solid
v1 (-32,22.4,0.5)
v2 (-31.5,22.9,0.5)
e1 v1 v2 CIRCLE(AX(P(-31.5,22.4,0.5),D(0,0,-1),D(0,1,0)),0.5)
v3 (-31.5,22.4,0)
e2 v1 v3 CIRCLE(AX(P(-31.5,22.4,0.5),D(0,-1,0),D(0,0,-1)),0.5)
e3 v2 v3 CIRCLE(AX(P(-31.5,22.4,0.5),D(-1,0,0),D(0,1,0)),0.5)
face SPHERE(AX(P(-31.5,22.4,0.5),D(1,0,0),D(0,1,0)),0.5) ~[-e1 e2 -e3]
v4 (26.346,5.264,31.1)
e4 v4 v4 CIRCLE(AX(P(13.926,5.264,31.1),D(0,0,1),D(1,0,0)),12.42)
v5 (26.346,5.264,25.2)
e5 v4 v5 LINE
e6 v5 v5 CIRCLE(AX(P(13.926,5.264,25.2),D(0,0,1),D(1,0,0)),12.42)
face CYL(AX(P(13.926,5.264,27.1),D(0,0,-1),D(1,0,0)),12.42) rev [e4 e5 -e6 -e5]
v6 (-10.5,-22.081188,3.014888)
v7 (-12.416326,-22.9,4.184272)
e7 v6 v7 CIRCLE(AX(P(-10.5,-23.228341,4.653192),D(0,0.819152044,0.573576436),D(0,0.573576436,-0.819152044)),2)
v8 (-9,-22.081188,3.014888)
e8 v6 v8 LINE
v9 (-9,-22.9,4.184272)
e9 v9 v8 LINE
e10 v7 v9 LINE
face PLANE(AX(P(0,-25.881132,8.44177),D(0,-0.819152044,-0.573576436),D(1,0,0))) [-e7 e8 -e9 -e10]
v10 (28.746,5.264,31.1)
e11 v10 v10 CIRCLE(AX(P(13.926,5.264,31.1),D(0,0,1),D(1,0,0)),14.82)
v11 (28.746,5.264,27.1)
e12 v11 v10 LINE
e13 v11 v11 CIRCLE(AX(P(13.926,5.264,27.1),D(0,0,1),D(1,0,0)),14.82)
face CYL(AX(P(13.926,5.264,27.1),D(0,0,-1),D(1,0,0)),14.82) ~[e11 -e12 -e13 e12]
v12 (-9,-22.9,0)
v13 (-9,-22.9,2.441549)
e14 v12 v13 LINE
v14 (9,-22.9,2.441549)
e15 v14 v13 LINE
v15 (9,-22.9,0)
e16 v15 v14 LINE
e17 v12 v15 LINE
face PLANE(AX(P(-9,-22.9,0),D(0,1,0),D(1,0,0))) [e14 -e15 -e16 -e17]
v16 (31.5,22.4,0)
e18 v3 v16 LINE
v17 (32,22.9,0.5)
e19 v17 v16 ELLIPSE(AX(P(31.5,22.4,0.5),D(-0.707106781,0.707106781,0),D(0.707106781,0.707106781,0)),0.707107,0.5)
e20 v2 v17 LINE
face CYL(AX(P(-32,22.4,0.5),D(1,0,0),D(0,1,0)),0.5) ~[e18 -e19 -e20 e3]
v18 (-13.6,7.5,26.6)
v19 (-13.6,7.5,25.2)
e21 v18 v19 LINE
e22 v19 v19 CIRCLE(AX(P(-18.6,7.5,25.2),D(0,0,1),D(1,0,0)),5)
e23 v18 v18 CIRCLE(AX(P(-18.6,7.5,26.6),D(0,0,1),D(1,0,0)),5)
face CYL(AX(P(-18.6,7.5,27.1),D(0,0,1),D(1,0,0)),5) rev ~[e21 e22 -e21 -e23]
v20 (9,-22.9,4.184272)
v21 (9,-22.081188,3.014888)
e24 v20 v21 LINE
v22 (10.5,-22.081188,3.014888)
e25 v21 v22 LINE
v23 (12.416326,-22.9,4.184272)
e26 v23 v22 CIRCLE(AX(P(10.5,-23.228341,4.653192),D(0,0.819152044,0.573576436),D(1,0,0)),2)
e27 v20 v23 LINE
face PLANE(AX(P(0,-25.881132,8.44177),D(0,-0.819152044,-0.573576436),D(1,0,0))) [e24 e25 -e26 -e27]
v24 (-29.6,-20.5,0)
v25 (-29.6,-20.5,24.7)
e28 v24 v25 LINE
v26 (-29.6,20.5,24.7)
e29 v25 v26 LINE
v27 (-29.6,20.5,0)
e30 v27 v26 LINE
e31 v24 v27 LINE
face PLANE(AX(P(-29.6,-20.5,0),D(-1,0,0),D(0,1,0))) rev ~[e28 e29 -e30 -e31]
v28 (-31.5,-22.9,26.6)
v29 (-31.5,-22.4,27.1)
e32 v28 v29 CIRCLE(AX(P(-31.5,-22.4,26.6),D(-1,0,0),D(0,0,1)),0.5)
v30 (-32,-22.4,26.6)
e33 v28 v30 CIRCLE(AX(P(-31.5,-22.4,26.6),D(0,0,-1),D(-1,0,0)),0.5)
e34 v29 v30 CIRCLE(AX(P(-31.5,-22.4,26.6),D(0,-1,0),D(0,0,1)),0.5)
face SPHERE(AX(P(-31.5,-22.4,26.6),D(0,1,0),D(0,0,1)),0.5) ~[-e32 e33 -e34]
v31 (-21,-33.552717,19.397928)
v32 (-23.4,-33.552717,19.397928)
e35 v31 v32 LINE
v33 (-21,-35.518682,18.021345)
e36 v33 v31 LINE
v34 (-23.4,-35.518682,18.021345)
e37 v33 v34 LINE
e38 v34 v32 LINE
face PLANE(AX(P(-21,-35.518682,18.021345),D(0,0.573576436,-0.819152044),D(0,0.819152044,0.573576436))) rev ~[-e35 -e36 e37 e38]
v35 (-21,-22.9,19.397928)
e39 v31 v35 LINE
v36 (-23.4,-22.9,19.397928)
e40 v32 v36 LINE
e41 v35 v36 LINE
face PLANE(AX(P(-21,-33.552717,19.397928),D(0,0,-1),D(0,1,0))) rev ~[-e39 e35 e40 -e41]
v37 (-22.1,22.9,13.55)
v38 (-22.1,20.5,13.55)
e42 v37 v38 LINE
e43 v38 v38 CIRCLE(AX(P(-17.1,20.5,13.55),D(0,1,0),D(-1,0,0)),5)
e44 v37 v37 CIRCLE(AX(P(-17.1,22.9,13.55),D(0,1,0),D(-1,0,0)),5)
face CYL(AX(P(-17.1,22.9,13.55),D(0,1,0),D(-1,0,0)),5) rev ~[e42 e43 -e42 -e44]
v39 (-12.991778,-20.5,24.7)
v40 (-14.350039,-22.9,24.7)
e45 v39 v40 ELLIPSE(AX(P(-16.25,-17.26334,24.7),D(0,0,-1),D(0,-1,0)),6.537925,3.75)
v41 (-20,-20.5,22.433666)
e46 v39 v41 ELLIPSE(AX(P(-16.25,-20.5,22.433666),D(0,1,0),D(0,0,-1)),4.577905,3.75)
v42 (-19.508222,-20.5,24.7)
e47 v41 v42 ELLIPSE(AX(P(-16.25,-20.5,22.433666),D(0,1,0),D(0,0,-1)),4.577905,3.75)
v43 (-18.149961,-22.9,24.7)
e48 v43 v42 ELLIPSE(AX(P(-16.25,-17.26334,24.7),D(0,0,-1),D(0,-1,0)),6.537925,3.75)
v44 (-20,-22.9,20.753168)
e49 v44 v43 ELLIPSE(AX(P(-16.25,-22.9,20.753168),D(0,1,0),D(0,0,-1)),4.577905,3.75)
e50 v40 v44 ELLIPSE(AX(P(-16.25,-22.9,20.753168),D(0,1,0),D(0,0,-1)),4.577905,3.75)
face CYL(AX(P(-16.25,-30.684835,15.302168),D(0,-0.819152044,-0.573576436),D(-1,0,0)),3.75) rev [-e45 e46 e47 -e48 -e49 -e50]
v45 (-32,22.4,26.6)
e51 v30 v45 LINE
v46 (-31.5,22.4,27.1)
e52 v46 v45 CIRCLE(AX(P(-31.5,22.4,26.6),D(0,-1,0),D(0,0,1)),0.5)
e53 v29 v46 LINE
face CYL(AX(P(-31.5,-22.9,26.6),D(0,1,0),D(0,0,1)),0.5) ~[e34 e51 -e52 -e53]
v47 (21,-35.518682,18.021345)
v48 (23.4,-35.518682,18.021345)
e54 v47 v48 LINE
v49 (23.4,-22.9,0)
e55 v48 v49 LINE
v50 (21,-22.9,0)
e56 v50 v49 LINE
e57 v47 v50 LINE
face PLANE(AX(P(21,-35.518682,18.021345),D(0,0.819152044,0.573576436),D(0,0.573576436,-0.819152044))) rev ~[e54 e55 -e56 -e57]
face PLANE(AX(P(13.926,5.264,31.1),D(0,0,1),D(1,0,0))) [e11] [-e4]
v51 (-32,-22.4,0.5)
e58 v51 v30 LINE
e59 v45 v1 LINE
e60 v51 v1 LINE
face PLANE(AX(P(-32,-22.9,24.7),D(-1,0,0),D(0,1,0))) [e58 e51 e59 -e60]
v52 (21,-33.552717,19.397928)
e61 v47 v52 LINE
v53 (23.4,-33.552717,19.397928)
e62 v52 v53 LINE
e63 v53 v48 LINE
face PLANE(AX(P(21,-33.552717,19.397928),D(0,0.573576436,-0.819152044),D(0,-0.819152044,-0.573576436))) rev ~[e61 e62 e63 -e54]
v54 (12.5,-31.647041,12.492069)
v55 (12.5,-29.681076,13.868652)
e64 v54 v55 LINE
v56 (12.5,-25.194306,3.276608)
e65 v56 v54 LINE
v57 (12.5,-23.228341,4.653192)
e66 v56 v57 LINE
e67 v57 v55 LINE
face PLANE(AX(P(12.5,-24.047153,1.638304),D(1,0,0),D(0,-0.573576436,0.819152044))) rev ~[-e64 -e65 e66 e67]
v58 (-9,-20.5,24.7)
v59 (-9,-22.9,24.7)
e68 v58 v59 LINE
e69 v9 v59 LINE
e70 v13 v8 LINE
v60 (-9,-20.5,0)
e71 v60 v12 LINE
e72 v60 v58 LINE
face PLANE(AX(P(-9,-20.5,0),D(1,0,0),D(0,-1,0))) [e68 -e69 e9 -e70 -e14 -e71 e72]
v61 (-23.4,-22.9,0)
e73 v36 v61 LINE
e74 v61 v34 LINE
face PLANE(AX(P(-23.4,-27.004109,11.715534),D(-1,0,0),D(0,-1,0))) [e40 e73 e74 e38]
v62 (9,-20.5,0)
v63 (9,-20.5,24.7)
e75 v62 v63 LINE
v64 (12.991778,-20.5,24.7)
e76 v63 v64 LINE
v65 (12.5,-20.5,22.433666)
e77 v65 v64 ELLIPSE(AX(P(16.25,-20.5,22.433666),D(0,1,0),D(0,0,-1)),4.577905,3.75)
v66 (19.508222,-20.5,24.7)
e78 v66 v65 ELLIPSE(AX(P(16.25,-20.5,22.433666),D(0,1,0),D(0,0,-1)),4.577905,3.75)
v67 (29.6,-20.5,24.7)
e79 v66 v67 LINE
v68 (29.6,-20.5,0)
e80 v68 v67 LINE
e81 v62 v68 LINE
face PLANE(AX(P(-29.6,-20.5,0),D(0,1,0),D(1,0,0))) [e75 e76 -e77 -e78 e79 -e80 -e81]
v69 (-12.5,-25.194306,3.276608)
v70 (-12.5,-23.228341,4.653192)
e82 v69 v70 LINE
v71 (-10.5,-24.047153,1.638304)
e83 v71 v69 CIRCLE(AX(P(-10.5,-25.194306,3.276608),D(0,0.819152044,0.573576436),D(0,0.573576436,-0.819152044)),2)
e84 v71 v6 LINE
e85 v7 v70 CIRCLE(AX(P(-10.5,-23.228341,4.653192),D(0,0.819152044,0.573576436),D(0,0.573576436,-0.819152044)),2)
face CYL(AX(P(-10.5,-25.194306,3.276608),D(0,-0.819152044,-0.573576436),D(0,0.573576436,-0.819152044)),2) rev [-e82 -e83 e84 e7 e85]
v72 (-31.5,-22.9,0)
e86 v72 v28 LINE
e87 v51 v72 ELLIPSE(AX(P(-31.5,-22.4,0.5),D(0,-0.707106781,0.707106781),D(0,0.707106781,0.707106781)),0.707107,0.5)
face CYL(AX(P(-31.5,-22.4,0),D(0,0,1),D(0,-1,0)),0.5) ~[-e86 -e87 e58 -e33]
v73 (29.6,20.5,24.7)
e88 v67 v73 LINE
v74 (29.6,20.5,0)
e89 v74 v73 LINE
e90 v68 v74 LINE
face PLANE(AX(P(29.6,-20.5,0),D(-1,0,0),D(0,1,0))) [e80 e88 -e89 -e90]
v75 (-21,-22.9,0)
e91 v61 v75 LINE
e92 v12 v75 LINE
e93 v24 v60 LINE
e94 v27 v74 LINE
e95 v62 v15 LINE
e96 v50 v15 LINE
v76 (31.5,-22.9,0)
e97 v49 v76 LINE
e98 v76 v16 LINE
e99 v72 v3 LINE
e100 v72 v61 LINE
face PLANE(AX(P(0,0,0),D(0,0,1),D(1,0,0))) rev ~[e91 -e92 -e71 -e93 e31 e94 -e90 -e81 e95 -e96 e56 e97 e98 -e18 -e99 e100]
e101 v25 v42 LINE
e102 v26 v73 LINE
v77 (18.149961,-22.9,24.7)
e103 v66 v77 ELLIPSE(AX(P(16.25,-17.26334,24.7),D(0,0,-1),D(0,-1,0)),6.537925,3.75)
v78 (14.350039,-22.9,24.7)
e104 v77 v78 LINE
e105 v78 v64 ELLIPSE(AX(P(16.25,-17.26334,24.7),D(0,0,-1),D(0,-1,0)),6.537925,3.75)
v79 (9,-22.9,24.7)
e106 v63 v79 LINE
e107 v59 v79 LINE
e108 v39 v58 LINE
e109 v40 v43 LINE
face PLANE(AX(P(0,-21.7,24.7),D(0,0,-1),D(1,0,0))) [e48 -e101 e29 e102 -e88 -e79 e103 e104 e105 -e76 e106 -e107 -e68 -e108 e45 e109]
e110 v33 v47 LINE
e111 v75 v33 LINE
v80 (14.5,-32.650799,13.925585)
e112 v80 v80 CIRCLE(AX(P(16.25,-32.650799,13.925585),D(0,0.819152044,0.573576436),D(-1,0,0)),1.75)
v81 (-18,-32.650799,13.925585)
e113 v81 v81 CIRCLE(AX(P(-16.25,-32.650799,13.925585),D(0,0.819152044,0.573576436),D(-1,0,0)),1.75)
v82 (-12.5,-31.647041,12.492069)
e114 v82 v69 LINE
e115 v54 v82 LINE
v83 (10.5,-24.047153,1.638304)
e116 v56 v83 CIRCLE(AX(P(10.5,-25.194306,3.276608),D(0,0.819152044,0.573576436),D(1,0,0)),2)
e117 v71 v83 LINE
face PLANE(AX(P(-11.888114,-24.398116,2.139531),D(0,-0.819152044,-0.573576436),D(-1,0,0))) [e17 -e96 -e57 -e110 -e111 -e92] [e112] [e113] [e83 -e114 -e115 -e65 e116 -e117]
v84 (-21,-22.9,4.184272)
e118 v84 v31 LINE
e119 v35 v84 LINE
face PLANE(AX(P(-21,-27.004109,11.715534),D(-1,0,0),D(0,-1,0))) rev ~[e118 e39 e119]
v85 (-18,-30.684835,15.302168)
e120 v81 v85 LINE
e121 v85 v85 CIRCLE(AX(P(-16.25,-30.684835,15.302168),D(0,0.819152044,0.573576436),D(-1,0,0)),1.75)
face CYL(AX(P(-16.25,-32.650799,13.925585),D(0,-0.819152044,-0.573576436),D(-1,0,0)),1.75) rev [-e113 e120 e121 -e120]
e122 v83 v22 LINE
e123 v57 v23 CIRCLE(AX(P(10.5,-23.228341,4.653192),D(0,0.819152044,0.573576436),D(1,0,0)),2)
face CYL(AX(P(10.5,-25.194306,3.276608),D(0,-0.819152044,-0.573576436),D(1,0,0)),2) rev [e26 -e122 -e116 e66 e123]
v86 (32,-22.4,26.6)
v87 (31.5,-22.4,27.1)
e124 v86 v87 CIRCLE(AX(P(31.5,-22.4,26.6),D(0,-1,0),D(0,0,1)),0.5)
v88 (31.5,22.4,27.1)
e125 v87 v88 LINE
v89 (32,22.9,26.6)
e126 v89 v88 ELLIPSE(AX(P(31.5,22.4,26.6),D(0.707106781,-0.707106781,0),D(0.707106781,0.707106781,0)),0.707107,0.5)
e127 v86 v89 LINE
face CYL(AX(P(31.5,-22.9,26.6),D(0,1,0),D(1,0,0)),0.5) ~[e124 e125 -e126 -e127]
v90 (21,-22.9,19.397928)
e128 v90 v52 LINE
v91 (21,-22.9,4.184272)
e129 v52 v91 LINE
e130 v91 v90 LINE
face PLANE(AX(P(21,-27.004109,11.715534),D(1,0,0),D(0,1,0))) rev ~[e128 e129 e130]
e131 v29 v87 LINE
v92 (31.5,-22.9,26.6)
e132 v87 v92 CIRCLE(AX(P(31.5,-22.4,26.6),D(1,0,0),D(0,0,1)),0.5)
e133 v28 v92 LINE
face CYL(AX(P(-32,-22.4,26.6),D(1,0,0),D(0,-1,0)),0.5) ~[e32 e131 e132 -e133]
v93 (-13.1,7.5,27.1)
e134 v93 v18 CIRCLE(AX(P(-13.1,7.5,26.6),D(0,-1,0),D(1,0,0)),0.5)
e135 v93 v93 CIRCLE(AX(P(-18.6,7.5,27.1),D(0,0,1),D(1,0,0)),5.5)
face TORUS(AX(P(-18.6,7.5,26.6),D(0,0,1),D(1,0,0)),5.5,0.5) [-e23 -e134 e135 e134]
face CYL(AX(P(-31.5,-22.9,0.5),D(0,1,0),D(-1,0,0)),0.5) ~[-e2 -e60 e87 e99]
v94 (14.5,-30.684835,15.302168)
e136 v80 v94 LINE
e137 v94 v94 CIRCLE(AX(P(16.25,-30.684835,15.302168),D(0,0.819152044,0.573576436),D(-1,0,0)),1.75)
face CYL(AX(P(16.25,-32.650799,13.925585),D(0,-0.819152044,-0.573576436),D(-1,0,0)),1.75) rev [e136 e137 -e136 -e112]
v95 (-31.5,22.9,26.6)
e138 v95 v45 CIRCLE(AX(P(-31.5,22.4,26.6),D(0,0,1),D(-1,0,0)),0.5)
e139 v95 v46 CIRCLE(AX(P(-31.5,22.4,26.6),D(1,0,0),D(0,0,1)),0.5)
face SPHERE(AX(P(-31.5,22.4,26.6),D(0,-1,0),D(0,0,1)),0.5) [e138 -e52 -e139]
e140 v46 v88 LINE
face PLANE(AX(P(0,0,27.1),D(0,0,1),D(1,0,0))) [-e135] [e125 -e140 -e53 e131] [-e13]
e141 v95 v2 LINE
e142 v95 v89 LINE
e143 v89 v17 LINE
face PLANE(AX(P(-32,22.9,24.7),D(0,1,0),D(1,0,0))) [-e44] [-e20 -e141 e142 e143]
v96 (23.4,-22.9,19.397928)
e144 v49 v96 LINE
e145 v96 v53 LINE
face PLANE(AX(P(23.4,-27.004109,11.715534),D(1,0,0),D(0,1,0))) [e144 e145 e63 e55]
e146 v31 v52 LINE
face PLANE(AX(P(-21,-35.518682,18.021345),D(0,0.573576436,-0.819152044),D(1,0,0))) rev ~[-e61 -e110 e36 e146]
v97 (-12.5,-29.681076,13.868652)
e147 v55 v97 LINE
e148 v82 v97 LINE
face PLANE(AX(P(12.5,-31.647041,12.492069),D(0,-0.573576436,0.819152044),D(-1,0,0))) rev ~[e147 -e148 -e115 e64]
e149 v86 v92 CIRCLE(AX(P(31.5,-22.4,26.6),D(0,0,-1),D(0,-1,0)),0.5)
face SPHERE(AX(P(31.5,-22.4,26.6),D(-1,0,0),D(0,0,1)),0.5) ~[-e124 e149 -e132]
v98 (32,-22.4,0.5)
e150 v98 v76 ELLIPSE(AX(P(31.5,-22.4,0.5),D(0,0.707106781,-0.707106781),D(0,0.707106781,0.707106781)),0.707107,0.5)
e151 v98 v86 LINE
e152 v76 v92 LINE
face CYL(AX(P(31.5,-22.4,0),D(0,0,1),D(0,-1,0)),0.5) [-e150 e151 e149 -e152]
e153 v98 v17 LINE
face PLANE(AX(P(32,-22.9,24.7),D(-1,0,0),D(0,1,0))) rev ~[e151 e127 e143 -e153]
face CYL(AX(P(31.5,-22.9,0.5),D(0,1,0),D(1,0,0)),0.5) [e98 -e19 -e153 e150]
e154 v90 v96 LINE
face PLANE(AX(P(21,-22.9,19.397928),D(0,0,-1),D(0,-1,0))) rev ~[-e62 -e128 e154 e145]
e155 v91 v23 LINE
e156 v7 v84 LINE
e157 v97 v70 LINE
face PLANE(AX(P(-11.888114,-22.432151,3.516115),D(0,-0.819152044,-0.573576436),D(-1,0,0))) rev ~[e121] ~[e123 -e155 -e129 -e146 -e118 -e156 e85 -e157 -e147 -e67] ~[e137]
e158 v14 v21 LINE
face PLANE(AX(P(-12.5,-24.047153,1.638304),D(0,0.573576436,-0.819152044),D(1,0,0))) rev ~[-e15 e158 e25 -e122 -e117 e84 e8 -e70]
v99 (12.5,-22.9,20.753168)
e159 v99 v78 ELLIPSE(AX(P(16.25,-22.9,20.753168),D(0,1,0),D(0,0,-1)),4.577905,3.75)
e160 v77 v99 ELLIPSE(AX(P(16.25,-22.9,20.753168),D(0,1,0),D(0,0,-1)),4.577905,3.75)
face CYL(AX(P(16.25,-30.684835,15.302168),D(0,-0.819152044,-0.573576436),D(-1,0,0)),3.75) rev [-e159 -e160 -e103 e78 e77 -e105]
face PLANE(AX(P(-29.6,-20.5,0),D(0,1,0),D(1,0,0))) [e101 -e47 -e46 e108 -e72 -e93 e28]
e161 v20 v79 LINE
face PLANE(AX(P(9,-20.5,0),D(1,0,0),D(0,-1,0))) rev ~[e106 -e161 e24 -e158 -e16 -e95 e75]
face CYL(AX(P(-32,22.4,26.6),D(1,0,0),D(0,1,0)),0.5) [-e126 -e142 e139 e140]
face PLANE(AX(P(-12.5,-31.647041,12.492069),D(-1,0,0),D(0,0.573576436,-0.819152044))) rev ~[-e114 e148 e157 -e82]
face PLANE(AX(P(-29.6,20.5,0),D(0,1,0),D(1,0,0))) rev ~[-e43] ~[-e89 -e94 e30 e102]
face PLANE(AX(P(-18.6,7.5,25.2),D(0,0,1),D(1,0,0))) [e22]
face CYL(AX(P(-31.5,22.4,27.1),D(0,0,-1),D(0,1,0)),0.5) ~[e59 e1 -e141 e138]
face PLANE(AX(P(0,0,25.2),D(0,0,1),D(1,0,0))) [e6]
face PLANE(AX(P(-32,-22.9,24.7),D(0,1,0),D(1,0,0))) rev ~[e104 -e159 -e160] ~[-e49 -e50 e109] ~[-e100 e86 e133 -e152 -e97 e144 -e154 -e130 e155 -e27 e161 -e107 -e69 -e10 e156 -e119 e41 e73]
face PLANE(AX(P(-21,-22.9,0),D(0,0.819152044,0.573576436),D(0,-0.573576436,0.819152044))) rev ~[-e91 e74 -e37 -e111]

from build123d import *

# Parameters (mm, degrees)
F5_W         = 64
F5_H         = 45.8
F5_W_2       = 59.2
F5_H_2       = 41
F6_DEPTH     = 24.7
F7_W         = 64
F7_H         = 45.8
F7_W_2       = 59.2
F7_H_2       = 41
F8_DEPTH     = 2.4
F9_R         = 5
F10_DEPTH    = 1.9
F11_R        = 14.82
F11_R_2      = 12.42
F12_DEPTH    = 4
F13_DEPTH    = 1.9
F14_R        = 5
F15_DEPTH    = 2.4
F17_R        = 1.75
F18_DEPTH    = 2.4
F20_DEPTH    = 2.4
F22_DEPTH    = 2.4
F23_R        = 1.75
F24_REACH    = 60.3061382673
F25_R        = 0.5
F26_W        = 18
F26_H        = 2.4
F27_DEPTH    = 24.7
F28_R        = 3.75
F29_REACH    = 63.5629925168
F31_DEPTH    = 2.4
F32_T1_DEPTH = 2.4


# Not quite as in the source:
# - a fillet or chamfer that OpenCascade refuses, or shapes differently, is made with other operations: its cross-section is extruded or revolved along the edge and cut away or added
# - a feature names something its author has since deleted; it is built from what else it names


with BuildPart() as f6:
    # F5 (on Top) → F6 (new body)
    with BuildSketch(Plane.XY):
        Rectangle(F5_W, F5_H)
        Rectangle(F5_W_2, F5_H_2, mode=Mode.SUBTRACT)
    extrude(amount=F6_DEPTH)

    # F7 (on face) → F8 (join)
    with BuildSketch(Plane.XY.offset(24.7)):
        Rectangle(F7_W, F7_H)
        Rectangle(F7_W_2, F7_H_2, mode=Mode.SUBTRACT)
        Rectangle(F7_W_2, F7_H_2)
    extrude(amount=F8_DEPTH)

    # F9 (on face) → F10 (cut)
    with BuildSketch(Plane.XY.offset(27.1)):
        with Locations((-18.6, 7.5)):
            Circle(F9_R)
    extrude(amount=-F10_DEPTH, mode=Mode.SUBTRACT)

    # F11 (on face) → F12 (join)
    with BuildSketch(Plane.XY.offset(27.1)):
        with Locations((13.926, 5.264)):
            Circle(F11_R)
        with Locations((13.926, 5.264)):
            Circle(F11_R_2, mode=Mode.SUBTRACT)
    extrude(amount=F12_DEPTH)

    # F13 (cut): a face of the model
    f13_faces = [f6.faces().sort_by_distance(p)[0] for p in [
        (13.926, 5.264, 27.1),
    ]]
    extrude(f13_faces, amount=-F13_DEPTH, mode=Mode.SUBTRACT)

    # F14 (on face) → F15 (cut)
    with BuildSketch(Plane(origin=(0, 22.9, 0), x_dir=(-1, 0, 0), z_dir=(0, 1, 0))):
        with Locations((17.1, 13.55)):
            Circle(F14_R)
    extrude(amount=-F15_DEPTH, mode=Mode.SUBTRACT)

    # F17 (on face) → F18 (join)
    with BuildSketch(Plane(origin=(0, -15.3661306411, -10.759480508), x_dir=(-1, 0, 0), z_dir=(0, 0.8191520443, 0.5735764364))):
        Polygon((0, 24.1349003924), (0, 13.1349003924), (21, 13.1349003924), (21, 35.1349003924), (0, 35.1349003924), align=None)
        with Locations((16.25, 30.1349003924)):
            Circle(F17_R, mode=Mode.SUBTRACT)
        Polygon((-21, 13.1349003924), (0, 13.1349003924), (0, 24.1349003924), (0, 35.1349003924), (-21, 35.1349003924), align=None)
        with Locations((-16.25, 30.1349003924)):
            Circle(F17_R, mode=Mode.SUBTRACT)
    extrude(amount=F18_DEPTH)

    # F19 (on face) → F20 (join)
    with BuildSketch(Plane(origin=(-21, 0, 0), x_dir=(0, -1, 0), z_dir=(-1, 0, 0))):
        Polygon((22.9, 0), (35.5186815997, 18.0213449744), (33.5527166934, 19.3979284216), (22.9, 19.3979284216), align=None)
    extrude(amount=F20_DEPTH)

    # F21 (on face) → F22 (join)
    with BuildSketch(Plane.YZ.offset(21)):
        Polygon((-35.5186815997, 18.0213449744), (-22.9, 0), (-22.9, 19.3979284216), (-33.5527166934, 19.3979284216), align=None)
    extrude(amount=F22_DEPTH)

    f24_end = f6.faces().sort_by_distance((0, 0, 24.7))[0]
    # F23 (on face) → F24 (cut, up to a face of the model that its end follows)
    with BuildSketch(Plane(origin=(0, -15.3661306411, -10.759480508), x_dir=(1, 0, 0), z_dir=(0, -0.8191520443, -0.5735764364))):
        with Locations((-16.25, 30.1349003924)):
            Circle(F23_R)
        with Locations((16.25, 30.1349003924)):
            Circle(F23_R)
    f24_long = extrude(amount=-F24_REACH, mode=Mode.PRIVATE)
    add(split(f24_long, bisect_by=f24_end, keep=Keep.TOP, mode=Mode.PRIVATE), mode=Mode.SUBTRACT)

    # F25
    f25_edges = [f6.edges().sort_by_distance(p)[0] for p in [
        (-32, 0, 27.1),
        (0, -22.9, 27.1),
        (32, 0, 27.1),
        (0, 22.9, 27.1),
        (-23.6, 7.5, 27.1),
        (32, 0, 0),
        (0, 22.9, 0),
        (-32, 22.9, 13.55),
        (-32, 0, 0),
        (-32, -22.9, 13.55),
        (32, -22.9, 13.55),
    ]]
    fillet(f25_edges, radius=F25_R)

    # F26 (on face) → F27 (cut, through all)
    with BuildSketch(Plane(origin=(0, 0, 0), x_dir=(1, 0, 0), z_dir=(0, 0, -1))):
        with Locations((0, 21.7)):
            Rectangle(F26_W, F26_H)
    extrude(amount=-F27_DEPTH, mode=Mode.SUBTRACT)

    f29_end = Plane(origin=(0, -0.3794689119, 24.7), x_dir=(-1, 0, 0), z_dir=(0, 0, -1))
    # F28 (on face) → F29 (cut, up to a plane its end follows)
    with BuildSketch(Plane(origin=(0, -13.4001657348, -9.3828970608), x_dir=(-1, 0, 0), z_dir=(0, 0.8191520443, 0.5735764364))):
        with Locations((16.25, 30.1349003924)):
            Circle(F28_R)
        with Locations((-16.25, 30.1349003924)):
            Circle(F28_R)
    f29_long = extrude(amount=F29_REACH, mode=Mode.PRIVATE)
    add(split(f29_long, bisect_by=f29_end, keep=Keep.TOP, mode=Mode.PRIVATE), mode=Mode.SUBTRACT)

    # F30 (on face) → F31 (cut)
    with BuildSketch(Plane(origin=(0, -15.3661306411, -10.759480508), x_dir=(1, 0, 0), z_dir=(0, -0.8191520443, -0.5735764364))):
        Polygon((12.5, 28.3849003924), (-12.5, 28.3849003924), (-12.5, 15.1349003924), (0, 15.1349003924), (12.5, 15.1349003924), align=None)
    extrude(amount=-F31_DEPTH, mode=Mode.SUBTRACT)

    # F32: fillet of radius 2 on 2 edges, made by hand

    # F32_s2 → F32_t1 (join)
    with BuildSketch(Plane(origin=(0, -15.3661306411, -10.759480508), x_dir=(1, 0, 0), z_dir=(0, 0.8191520443, 0.5735764364))):
        with BuildLine():
            ThreePointArc((-10.5, -15.1349003924), (-11.9142135624, -15.7206868301), (-12.5, -17.1349003924))
            Line((-12.5, -17.1349003924), (-12.5, -15.1349003924))
            Line((-12.5, -15.1349003924), (-10.5, -15.1349003924))
        make_face()
        with BuildLine():
            ThreePointArc((12.5, -17.1349003924), (11.9142135624, -15.7206868301), (10.5, -15.1349003924))
            Line((10.5, -15.1349003924), (12.5, -15.1349003924))
            Line((12.5, -15.1349003924), (12.5, -17.1349003924))
        make_face()
    extrude(amount=F32_T1_DEPTH)


solid = f6.part
